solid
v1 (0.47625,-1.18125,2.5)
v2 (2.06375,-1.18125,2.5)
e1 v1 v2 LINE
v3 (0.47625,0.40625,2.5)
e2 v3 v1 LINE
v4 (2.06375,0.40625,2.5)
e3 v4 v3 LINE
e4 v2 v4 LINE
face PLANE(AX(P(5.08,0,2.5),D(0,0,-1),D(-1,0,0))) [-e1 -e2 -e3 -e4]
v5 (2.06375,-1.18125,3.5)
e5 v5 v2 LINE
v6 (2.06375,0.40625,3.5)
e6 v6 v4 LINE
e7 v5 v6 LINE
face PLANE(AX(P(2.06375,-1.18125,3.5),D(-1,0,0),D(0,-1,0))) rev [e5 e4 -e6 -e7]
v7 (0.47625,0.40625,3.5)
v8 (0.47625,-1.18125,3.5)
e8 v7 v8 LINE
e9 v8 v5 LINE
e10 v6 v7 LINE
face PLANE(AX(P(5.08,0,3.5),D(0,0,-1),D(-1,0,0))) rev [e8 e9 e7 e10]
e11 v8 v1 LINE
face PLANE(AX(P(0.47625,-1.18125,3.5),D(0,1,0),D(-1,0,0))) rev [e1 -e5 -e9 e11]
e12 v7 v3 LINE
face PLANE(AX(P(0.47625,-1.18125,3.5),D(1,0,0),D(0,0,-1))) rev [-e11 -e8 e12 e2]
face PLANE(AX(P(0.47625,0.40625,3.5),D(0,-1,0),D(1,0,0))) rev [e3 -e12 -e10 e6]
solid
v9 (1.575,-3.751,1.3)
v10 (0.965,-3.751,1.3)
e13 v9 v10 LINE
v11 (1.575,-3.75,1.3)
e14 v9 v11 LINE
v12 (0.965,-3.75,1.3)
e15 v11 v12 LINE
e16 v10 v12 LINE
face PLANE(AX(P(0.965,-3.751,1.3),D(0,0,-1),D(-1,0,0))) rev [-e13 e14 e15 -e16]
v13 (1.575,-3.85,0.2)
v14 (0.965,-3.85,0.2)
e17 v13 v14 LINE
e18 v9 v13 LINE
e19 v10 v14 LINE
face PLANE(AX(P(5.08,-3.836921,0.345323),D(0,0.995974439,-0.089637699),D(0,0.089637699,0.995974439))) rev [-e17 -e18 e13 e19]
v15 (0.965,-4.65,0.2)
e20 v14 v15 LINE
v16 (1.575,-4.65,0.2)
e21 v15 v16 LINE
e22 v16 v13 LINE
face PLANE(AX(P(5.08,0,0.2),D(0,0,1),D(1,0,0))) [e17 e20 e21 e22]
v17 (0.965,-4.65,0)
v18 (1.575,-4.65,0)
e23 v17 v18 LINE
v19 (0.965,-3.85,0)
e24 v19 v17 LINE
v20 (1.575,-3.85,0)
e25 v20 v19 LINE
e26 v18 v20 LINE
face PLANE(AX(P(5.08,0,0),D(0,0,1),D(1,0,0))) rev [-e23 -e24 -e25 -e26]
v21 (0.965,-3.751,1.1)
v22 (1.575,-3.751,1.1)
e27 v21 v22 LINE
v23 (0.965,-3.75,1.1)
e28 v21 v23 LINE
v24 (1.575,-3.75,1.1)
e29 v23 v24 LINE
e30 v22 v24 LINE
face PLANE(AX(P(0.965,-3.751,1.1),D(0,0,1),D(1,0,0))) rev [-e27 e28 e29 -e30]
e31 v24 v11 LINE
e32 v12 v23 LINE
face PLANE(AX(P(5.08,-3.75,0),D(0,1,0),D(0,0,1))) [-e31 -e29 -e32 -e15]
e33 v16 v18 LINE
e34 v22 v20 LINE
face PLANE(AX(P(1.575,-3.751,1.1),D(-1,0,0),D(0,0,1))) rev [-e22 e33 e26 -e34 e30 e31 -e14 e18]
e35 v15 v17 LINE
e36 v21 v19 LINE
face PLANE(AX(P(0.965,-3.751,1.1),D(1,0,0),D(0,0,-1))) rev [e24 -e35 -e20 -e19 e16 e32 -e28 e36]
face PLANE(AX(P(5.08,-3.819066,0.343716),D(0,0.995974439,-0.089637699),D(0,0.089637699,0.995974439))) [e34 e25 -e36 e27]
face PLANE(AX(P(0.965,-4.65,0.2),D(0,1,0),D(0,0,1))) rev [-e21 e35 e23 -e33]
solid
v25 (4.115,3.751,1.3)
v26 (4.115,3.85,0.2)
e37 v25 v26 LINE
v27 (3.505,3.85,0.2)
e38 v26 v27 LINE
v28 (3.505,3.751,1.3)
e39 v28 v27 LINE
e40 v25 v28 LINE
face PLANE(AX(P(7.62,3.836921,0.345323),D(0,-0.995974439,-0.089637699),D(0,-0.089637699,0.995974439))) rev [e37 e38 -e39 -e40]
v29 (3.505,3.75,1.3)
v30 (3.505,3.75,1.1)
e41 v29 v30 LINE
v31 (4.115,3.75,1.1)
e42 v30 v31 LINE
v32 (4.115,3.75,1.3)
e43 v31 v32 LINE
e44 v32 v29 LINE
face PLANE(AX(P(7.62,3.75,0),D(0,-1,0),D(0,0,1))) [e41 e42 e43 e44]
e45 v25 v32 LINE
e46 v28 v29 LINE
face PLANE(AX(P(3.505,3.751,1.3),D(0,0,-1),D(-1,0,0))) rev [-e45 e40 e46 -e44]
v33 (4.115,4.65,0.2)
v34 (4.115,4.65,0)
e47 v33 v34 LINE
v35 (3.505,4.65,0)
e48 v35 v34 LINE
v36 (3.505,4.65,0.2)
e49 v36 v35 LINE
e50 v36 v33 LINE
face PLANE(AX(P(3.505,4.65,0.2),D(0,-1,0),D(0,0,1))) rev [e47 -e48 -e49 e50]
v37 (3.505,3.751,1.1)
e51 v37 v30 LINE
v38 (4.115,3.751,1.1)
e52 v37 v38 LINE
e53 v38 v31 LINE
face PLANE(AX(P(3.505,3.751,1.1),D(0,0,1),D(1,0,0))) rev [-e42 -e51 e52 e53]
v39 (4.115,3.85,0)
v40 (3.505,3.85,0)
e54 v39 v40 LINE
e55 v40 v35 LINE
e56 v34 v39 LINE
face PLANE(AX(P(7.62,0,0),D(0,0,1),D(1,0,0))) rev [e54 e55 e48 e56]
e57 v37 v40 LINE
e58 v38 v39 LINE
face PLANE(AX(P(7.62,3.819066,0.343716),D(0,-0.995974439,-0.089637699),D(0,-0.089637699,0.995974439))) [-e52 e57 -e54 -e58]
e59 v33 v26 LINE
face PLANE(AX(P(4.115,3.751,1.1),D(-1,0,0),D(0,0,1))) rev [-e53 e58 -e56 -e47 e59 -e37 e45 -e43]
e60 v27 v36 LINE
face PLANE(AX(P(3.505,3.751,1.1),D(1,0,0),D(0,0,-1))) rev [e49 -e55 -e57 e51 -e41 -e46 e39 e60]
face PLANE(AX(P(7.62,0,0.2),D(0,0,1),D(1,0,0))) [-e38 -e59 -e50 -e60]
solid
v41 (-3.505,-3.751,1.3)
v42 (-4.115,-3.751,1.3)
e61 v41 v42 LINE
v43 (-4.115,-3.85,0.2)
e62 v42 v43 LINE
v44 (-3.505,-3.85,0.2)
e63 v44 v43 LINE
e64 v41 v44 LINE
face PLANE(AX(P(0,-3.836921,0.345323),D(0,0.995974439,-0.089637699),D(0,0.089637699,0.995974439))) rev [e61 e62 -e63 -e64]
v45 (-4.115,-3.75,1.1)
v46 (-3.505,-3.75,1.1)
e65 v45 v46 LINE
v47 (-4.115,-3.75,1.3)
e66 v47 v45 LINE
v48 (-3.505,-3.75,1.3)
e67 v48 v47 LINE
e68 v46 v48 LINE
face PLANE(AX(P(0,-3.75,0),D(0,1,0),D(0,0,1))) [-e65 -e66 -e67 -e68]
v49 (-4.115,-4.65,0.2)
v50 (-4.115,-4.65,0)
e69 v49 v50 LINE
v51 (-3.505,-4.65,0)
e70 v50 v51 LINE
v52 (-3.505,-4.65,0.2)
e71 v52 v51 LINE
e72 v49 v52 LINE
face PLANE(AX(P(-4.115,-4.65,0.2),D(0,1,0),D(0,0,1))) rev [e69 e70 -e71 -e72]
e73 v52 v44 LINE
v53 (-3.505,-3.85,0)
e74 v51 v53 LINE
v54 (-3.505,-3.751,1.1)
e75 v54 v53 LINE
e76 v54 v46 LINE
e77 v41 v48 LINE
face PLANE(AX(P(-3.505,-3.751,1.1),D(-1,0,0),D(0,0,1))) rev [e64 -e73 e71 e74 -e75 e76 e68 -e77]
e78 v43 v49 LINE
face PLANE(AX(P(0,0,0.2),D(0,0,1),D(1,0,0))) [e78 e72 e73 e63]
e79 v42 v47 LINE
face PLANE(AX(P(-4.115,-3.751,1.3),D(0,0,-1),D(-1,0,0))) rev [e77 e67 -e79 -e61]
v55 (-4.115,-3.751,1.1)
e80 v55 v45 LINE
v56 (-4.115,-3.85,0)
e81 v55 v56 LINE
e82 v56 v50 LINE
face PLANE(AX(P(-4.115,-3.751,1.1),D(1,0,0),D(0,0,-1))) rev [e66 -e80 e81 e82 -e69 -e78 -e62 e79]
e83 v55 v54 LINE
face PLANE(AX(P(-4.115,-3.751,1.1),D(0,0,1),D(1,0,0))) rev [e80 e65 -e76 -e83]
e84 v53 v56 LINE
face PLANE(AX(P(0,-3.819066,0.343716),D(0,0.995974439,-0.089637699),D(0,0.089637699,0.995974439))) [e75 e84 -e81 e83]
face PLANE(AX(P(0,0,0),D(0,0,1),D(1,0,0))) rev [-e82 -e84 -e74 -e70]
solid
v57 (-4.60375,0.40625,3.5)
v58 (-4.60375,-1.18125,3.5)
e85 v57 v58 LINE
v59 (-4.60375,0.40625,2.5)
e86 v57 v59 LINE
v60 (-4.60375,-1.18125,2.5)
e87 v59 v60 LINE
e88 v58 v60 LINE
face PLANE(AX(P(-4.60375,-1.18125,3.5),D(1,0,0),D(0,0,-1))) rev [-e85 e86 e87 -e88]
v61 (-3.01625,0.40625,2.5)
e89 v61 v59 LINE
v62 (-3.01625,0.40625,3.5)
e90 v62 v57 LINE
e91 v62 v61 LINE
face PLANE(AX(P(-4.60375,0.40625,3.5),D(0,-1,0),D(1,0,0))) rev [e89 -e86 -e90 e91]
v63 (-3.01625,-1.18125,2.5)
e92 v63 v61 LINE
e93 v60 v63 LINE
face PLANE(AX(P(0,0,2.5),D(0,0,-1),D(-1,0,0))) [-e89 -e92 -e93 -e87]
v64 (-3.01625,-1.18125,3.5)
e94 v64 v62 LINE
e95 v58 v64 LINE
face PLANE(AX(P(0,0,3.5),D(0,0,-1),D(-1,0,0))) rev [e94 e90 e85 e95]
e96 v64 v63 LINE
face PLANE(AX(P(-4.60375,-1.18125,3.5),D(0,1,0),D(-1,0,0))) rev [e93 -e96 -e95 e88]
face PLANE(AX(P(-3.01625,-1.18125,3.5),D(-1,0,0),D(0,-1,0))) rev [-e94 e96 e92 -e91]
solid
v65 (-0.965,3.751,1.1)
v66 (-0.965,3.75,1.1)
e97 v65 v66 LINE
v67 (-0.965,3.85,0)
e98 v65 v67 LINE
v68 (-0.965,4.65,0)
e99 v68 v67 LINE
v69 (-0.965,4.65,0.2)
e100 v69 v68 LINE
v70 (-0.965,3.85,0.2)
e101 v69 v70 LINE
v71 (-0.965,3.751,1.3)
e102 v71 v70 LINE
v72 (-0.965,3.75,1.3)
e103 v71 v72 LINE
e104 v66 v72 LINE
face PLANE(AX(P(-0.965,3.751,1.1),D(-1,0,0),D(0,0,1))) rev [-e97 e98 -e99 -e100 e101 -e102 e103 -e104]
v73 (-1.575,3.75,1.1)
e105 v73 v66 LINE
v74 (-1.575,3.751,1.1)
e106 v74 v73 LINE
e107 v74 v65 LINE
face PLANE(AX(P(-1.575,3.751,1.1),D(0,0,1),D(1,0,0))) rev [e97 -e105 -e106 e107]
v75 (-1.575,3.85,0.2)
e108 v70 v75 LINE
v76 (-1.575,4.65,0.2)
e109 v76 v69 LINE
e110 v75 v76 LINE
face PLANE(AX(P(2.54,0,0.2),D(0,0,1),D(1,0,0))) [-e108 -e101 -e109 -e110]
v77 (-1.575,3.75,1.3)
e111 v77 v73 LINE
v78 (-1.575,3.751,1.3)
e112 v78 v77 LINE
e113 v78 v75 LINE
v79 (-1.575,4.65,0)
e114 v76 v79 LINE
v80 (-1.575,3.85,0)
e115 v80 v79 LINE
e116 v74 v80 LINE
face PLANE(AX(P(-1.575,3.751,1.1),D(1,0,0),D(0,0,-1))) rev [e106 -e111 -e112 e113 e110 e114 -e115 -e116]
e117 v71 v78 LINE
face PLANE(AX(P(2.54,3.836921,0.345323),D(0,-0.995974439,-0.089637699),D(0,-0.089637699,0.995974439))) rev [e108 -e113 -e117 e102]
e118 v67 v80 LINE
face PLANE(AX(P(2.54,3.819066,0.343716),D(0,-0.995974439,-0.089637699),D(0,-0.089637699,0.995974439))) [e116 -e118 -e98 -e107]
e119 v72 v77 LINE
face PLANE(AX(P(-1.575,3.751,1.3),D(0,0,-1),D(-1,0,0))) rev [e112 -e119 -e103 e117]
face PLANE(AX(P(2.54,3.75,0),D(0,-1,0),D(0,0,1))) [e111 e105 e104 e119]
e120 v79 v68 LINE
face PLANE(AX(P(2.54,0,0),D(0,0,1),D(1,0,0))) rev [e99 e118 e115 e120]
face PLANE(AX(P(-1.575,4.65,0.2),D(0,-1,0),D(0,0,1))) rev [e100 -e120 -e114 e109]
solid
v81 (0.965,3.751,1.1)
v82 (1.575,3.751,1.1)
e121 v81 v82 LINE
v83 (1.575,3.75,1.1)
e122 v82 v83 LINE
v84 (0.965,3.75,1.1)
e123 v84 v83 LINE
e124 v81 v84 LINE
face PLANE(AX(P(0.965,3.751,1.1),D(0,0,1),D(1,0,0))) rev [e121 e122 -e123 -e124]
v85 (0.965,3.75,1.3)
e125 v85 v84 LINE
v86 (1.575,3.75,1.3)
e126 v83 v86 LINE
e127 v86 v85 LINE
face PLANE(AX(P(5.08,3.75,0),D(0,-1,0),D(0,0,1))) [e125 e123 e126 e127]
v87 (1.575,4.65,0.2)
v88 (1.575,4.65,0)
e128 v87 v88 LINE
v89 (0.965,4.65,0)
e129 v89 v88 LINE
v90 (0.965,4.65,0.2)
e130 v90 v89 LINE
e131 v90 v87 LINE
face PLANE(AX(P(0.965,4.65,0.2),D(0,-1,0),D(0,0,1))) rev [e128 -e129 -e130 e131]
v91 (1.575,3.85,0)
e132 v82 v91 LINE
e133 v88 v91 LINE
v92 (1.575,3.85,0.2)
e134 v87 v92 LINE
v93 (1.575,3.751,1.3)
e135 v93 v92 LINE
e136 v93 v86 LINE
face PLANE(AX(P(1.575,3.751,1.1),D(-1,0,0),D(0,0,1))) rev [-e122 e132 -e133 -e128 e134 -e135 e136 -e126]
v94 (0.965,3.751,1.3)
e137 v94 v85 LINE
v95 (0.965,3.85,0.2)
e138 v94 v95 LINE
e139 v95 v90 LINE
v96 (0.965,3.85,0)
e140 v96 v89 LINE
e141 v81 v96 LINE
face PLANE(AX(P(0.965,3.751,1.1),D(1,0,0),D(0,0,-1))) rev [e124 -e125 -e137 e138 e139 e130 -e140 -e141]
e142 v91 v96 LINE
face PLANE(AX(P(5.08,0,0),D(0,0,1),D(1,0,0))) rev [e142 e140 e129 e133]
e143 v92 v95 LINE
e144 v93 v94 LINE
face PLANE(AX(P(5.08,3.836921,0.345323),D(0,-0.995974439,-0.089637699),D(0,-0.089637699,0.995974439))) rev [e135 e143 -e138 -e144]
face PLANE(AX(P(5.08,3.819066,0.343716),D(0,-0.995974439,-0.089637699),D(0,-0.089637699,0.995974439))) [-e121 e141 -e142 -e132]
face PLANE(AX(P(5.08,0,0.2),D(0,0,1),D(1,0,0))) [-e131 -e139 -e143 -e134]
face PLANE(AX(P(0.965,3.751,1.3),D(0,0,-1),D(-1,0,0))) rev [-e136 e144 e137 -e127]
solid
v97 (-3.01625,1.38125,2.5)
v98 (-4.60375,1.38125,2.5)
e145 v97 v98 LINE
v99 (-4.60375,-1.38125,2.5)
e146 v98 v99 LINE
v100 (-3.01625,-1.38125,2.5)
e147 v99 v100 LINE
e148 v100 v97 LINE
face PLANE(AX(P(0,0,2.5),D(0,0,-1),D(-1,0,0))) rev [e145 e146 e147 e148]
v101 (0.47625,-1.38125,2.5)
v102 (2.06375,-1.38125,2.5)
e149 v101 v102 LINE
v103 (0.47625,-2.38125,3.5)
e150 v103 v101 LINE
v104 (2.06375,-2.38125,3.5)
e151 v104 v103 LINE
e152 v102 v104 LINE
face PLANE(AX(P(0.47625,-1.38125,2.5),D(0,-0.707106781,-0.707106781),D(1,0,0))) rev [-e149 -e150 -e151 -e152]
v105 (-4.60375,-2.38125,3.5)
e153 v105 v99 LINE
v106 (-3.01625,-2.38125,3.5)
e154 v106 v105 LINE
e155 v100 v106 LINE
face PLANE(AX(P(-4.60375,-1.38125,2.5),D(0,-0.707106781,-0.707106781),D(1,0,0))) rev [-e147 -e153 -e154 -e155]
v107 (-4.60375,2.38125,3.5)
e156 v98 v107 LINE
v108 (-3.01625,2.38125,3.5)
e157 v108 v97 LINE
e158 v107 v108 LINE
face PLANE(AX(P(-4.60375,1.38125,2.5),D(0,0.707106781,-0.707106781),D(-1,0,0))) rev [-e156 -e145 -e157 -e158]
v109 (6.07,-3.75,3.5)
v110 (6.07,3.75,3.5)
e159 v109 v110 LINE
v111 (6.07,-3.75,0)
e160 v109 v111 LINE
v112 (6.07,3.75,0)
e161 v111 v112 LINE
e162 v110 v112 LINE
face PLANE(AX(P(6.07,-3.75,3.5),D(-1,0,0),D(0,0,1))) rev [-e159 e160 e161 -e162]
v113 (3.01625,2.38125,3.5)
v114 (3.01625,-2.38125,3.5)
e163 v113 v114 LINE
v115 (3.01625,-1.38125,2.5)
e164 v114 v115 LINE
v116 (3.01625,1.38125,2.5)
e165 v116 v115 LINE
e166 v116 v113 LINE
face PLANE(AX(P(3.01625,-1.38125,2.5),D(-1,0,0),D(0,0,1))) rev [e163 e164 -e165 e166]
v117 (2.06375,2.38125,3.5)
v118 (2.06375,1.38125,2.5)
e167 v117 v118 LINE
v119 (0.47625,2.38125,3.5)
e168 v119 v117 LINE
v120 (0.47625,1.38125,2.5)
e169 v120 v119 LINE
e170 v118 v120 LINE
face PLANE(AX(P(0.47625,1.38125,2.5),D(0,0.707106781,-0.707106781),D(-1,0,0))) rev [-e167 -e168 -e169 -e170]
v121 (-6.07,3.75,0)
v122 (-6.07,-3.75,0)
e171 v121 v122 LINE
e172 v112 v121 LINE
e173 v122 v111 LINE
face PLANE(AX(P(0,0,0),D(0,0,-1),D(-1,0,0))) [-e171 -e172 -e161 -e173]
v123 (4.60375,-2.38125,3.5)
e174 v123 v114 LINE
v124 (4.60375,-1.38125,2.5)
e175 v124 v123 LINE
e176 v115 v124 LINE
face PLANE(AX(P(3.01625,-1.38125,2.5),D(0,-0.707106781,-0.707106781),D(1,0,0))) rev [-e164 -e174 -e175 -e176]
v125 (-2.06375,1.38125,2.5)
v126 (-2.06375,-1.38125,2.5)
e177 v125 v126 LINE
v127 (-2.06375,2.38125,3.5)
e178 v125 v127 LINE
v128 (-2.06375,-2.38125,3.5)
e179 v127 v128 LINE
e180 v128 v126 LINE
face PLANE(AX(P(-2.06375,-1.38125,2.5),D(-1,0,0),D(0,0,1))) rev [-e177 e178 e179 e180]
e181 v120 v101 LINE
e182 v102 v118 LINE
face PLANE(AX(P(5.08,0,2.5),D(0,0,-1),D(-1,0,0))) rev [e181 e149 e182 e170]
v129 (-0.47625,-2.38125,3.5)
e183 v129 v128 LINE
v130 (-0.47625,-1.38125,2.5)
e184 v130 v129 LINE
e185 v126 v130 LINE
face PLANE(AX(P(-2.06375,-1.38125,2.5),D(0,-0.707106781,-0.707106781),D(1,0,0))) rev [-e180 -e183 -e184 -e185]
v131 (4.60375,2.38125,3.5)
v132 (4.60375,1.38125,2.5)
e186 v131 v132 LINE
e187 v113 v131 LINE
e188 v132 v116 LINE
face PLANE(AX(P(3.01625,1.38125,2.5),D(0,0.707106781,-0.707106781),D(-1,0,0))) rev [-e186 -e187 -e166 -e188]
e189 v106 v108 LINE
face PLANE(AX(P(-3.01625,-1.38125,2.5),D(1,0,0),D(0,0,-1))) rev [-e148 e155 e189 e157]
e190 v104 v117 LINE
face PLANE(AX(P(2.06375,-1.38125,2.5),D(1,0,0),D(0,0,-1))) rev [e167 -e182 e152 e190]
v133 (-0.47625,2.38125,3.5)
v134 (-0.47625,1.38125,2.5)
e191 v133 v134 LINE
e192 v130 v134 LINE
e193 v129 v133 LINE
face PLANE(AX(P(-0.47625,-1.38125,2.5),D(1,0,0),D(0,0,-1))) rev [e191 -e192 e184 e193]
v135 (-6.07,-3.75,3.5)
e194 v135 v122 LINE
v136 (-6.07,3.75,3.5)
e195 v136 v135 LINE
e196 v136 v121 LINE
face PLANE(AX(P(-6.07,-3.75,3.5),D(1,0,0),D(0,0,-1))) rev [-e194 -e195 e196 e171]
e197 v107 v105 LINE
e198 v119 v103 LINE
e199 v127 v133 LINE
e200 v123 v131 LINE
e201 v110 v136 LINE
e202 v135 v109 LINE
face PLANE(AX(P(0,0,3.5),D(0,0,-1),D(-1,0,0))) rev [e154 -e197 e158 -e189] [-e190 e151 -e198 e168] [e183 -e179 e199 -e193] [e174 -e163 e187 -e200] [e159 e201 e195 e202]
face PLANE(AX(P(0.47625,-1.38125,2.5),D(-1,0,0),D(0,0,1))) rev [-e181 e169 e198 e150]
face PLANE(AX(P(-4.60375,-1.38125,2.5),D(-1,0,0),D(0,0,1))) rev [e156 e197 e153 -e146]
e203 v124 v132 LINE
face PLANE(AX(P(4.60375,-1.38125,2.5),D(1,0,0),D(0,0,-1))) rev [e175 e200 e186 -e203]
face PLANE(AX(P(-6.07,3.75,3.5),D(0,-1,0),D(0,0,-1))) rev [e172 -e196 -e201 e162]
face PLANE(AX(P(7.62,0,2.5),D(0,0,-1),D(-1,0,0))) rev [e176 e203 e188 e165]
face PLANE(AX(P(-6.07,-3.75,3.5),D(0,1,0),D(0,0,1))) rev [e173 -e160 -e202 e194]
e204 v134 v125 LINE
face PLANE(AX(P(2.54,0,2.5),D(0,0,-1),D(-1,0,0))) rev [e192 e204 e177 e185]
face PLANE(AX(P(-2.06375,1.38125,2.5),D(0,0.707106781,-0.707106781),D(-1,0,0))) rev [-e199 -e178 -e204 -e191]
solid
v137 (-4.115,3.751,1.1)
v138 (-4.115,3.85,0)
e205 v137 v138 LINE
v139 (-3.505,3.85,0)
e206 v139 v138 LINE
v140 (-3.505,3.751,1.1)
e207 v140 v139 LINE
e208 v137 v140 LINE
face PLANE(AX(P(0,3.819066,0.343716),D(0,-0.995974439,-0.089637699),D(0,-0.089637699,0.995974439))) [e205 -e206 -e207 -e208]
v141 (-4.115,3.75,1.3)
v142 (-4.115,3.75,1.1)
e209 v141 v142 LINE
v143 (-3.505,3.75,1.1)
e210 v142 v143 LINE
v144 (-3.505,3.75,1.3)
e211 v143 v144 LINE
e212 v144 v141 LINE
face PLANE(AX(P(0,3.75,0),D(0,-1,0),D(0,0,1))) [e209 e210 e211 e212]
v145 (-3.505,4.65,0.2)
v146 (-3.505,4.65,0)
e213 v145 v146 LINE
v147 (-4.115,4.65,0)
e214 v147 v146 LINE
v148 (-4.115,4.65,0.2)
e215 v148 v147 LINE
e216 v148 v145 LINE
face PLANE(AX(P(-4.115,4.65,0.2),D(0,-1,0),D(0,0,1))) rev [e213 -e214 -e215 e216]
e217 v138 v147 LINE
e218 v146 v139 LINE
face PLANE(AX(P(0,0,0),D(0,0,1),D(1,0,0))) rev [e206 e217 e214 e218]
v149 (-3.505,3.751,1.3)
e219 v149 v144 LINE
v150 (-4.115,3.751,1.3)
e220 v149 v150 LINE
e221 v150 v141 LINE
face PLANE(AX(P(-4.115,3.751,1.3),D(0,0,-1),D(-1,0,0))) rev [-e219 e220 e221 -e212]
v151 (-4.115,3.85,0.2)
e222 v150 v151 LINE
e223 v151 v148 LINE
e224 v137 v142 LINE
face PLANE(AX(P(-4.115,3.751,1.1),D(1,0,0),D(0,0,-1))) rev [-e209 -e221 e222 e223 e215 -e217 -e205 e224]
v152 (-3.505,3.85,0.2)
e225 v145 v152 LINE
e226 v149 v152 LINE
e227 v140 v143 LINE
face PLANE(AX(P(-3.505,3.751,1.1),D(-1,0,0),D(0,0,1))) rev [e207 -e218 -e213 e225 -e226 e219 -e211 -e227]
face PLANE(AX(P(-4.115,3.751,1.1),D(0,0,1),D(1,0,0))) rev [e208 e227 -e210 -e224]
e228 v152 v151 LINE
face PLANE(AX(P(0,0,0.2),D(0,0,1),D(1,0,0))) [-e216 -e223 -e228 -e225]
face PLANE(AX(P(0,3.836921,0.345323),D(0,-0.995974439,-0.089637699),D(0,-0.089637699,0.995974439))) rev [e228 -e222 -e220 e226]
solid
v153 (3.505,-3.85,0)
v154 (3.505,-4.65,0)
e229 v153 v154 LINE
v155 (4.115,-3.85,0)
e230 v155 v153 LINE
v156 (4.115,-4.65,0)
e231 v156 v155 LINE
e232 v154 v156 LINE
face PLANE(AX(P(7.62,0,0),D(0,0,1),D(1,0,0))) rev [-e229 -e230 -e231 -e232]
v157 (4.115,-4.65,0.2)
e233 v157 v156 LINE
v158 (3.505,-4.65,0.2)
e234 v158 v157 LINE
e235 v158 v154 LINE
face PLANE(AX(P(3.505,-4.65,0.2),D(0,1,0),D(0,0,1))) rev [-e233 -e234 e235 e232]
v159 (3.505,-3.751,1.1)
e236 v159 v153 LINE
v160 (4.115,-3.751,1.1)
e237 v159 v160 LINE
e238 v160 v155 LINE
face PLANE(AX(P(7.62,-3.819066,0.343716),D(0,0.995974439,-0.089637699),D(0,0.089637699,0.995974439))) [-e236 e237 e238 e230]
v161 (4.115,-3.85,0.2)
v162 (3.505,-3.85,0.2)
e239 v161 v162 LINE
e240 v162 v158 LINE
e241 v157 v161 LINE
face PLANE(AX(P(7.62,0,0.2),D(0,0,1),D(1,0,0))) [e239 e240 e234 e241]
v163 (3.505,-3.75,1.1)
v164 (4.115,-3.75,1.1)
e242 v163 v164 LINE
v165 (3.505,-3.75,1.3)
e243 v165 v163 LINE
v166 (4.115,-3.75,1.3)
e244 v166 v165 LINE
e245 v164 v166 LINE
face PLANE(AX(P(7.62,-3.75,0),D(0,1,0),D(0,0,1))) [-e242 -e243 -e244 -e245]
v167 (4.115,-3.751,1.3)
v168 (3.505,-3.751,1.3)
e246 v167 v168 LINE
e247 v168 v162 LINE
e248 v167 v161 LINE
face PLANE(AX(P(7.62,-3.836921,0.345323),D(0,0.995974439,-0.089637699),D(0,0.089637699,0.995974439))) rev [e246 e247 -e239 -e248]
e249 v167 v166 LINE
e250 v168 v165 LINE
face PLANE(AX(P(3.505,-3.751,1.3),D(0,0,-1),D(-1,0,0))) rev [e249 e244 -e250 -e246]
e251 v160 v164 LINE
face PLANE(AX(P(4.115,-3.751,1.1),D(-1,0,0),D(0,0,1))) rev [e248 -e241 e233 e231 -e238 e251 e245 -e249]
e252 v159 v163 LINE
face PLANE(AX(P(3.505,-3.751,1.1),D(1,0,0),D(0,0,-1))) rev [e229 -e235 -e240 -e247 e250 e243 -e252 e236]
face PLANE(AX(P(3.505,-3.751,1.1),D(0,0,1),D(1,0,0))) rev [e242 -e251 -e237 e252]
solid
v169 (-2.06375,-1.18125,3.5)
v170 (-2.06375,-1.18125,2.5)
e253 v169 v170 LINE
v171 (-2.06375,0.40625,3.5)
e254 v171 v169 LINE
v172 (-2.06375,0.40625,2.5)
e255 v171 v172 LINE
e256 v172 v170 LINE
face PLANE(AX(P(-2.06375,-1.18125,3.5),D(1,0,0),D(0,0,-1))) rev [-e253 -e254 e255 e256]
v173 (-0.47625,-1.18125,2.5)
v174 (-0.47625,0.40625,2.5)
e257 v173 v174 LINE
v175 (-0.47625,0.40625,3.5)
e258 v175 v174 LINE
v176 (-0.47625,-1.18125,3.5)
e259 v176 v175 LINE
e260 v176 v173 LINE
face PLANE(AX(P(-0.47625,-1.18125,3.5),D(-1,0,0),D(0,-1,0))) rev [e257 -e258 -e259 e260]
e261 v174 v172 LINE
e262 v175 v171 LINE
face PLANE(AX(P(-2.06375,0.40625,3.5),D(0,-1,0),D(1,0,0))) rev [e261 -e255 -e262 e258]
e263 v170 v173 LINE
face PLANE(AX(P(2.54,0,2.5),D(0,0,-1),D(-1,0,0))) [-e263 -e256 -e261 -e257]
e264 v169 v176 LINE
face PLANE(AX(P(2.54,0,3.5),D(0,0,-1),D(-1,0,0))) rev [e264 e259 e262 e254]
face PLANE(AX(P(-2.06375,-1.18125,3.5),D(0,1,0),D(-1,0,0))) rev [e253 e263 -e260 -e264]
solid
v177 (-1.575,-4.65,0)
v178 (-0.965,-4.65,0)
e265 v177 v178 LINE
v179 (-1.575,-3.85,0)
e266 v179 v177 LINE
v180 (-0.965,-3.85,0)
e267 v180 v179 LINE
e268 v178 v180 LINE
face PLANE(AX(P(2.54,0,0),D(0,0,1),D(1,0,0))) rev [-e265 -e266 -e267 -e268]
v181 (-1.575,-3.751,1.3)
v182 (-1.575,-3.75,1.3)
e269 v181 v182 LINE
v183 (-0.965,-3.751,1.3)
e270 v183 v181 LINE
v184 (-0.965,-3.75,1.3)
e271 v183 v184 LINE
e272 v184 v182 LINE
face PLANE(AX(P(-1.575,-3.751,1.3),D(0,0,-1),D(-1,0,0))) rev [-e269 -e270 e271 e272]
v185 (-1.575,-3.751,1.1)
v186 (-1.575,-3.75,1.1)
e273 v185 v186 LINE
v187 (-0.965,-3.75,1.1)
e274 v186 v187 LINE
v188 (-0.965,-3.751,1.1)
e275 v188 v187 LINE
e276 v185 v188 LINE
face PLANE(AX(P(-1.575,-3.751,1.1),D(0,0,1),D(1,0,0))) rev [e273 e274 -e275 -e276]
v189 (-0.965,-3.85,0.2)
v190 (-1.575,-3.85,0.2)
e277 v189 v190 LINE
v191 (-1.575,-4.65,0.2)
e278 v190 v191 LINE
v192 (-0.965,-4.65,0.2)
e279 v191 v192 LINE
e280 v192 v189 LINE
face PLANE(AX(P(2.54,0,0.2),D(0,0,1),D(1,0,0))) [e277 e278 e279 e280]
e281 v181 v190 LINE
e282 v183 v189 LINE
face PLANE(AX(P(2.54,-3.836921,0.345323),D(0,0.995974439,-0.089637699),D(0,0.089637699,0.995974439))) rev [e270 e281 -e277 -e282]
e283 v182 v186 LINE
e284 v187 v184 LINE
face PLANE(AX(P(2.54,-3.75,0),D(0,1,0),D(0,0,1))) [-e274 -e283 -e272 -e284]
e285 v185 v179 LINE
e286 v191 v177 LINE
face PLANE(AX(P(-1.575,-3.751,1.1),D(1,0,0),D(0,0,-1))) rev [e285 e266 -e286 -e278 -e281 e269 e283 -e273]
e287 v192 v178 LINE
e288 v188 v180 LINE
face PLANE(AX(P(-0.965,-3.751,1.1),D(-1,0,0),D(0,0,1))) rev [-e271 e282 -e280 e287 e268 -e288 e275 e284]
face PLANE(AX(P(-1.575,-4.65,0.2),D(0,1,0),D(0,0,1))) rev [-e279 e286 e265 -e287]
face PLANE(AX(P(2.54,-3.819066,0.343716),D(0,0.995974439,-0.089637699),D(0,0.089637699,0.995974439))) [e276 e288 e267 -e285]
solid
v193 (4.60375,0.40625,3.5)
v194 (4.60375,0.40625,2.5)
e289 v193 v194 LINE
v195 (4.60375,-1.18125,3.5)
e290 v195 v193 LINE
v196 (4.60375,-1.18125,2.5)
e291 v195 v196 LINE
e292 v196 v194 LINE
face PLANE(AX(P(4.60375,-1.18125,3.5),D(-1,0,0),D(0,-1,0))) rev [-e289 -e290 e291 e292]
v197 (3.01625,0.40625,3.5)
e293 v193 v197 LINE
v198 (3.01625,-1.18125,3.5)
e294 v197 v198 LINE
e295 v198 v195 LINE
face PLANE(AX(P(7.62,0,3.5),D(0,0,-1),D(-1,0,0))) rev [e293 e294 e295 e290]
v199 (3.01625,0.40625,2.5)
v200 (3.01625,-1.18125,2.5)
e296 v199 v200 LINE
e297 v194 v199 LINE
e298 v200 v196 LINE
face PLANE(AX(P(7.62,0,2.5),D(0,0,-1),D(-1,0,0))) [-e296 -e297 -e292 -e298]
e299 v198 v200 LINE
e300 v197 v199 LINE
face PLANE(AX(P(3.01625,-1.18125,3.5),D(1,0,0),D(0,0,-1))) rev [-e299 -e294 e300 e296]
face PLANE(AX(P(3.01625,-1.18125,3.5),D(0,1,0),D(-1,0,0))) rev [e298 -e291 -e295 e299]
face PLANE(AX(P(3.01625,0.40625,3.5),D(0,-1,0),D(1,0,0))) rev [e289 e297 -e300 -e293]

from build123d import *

# Parameters (mm, degrees)
SKETCH_1_W                         = 12.14
SKETCH_1_H                         = 7.5
EXTRUDE_1_DEPTH                    = 3.5
SKETCH_2_W                         = 1.5875
SKETCH_2_H                         = 2.7625
CUT_EXTRUDE_1_DEPTH                = 1
CHAMFER_1_SIZE                     = 1
SKETCH_3_W                         = 1.5875
SKETCH_3_H                         = 1.5875
EXTRUDE_3_DEPTH                    = 1
PATTERN_LINEAR_1_COUNT             = 4
PATTERN_LINEAR_1_PITCH             = 2.54
CHAMFER_1_OF_PATTERN_LINEAR_1_SIZE = 1
PATTERN_LINEAR_2_COUNT             = 4
PATTERN_LINEAR_2_PITCH             = 2.54
SKETCH_4_W                         = 0.61
SKETCH_4_H                         = 0.8
EXTRUDE_4_DEPTH                    = 0.2
SKETCH_5_W                         = 0.61
SKETCH_5_H                         = 0.2
EXTRUDE_5_DEPTH                    = 0.001
PATTERN_LINEAR_3_COUNT             = 4
PATTERN_LINEAR_3_PITCH             = 2.54


with BuildPart() as part:
    # Эскиз1 → Бобышка-Вытянуть1 (new body)
    with BuildSketch(Plane.XY):
        Rectangle(SKETCH_1_W, SKETCH_1_H)
    extrude(amount=EXTRUDE_1_DEPTH)

    # Эскиз2 → Вырез-Вытянуть1 (cut)
    with BuildSketch(Plane.XY.offset(3.5)):
        with Locations((-3.81, 0)):
            Rectangle(SKETCH_2_W, SKETCH_2_H)
    cut_extrude_1 = extrude(amount=-CUT_EXTRUDE_1_DEPTH, mode=Mode.SUBTRACT)

    # Фаска1
    chamfer_1_edges = [part.edges().sort_by_distance(p)[0] for p in [
        (-3.81, 1.38125, 3.5),
        (-3.81, -1.38125, 3.5),
    ]]
    chamfer(chamfer_1_edges, length=CHAMFER_1_SIZE - 0.0001)  # a hair under: the kernel refuses the full size

    # Линейный массив1: Вырез-Вытянуть1 ×4
    with Locations(*[(i * PATTERN_LINEAR_1_PITCH, 0, 0) for i in range(1, PATTERN_LINEAR_1_COUNT)]):
        add(cut_extrude_1, mode=Mode.SUBTRACT)

    # Фаска1 of Линейный массив1
    chamfer_1_of_pattern_linear_1_edges = [part.edges().sort_by_distance(p)[0] for p in [
        (-1.27, 1.38125, 3.5),
        (-1.27, -1.38125, 3.5),
        (1.27, 1.38125, 3.5),
        (1.27, -1.38125, 3.5),
        (3.81, 1.38125, 3.5),
        (3.81, -1.38125, 3.5),
    ]]
    chamfer(chamfer_1_of_pattern_linear_1_edges, length=CHAMFER_1_OF_PATTERN_LINEAR_1_SIZE - 0.0001)  # a hair under: the kernel refuses the full size


with BuildPart() as body_2:
    # Эскиз3 → Бобышка-Вытянуть3 (new body)
    with BuildSketch(Plane.XY.offset(2.5)):
        with Locations((-3.81, -0.3875)):
            Rectangle(SKETCH_3_W, SKETCH_3_H)
    extrude_3 = extrude(amount=EXTRUDE_3_DEPTH)


with BuildPart() as pattern_linear_2_1:
    # Линейный массив2: Бобышка-Вытянуть3 ×4
    with Locations(*[(i * PATTERN_LINEAR_2_PITCH, 0, 0) for i in range(1, PATTERN_LINEAR_2_COUNT)]):
        add(extrude_3)


with BuildPart() as body_6:
    # Эскиз4 → Бобышка-Вытянуть4 (new body)
    with BuildSketch(Plane.XY):
        with Locations((-3.81, -4.25)):
            Rectangle(SKETCH_4_W, SKETCH_4_H)
    extrude(amount=EXTRUDE_4_DEPTH)


with BuildPart() as body_7:
    # Эскиз5 → Бобышка-Вытянуть5 (new body)
    with BuildSketch(Plane.XZ.offset(3.75)):
        with Locations((-3.81, 1.2)):
            Rectangle(SKETCH_5_W, SKETCH_5_H)
    extrude(amount=EXTRUDE_5_DEPTH)


    add(body_6.part)  # loft_1 joins it to this body
    # loft from a face of the part (loft_1)
    loft([body_7.faces().sort_by_distance((-3.81, -3.751, 1.2))[0], body_7.faces().sort_by_distance((-3.81, -3.85, 0.1))[0]])


with BuildPart() as pattern_linear_3_1:
    # Линейный массив3: pattern copy
    add(body_7.part.moved(Location(Vector(1, 0, 0) * (1 * PATTERN_LINEAR_3_PITCH))))


with BuildPart() as pattern_linear_3_2:
    # Линейный массив3: pattern copy
    add(body_7.part.moved(Location(Vector(1, 0, 0) * (2 * PATTERN_LINEAR_3_PITCH))))


with BuildPart() as pattern_linear_3_3:
    # Линейный массив3: pattern copy
    add(body_7.part.moved(Location(Vector(1, 0, 0) * (3 * PATTERN_LINEAR_3_PITCH))))


with BuildPart() as body_10:
    # Зеркальное отражение4: mirrored copy
    add(pattern_linear_3_1.part.mirror(Plane.ZX))


with BuildPart() as body_11:
    # Mirror 4 2: mirrored copy
    add(pattern_linear_3_2.part.mirror(Plane.ZX))


with BuildPart() as body_12:
    # Mirror 4 3: mirrored copy
    add(pattern_linear_3_3.part.mirror(Plane.ZX))


with BuildPart() as body_13:
    # Mirror 4 4: mirrored copy
    add(body_7.part.mirror(Plane.ZX))


solid = Compound([part.part, body_2.part, pattern_linear_2_1.part, body_7.part, pattern_linear_3_1.part, pattern_linear_3_2.part, pattern_linear_3_3.part, body_10.part, body_11.part, body_12.part, body_13.part])
